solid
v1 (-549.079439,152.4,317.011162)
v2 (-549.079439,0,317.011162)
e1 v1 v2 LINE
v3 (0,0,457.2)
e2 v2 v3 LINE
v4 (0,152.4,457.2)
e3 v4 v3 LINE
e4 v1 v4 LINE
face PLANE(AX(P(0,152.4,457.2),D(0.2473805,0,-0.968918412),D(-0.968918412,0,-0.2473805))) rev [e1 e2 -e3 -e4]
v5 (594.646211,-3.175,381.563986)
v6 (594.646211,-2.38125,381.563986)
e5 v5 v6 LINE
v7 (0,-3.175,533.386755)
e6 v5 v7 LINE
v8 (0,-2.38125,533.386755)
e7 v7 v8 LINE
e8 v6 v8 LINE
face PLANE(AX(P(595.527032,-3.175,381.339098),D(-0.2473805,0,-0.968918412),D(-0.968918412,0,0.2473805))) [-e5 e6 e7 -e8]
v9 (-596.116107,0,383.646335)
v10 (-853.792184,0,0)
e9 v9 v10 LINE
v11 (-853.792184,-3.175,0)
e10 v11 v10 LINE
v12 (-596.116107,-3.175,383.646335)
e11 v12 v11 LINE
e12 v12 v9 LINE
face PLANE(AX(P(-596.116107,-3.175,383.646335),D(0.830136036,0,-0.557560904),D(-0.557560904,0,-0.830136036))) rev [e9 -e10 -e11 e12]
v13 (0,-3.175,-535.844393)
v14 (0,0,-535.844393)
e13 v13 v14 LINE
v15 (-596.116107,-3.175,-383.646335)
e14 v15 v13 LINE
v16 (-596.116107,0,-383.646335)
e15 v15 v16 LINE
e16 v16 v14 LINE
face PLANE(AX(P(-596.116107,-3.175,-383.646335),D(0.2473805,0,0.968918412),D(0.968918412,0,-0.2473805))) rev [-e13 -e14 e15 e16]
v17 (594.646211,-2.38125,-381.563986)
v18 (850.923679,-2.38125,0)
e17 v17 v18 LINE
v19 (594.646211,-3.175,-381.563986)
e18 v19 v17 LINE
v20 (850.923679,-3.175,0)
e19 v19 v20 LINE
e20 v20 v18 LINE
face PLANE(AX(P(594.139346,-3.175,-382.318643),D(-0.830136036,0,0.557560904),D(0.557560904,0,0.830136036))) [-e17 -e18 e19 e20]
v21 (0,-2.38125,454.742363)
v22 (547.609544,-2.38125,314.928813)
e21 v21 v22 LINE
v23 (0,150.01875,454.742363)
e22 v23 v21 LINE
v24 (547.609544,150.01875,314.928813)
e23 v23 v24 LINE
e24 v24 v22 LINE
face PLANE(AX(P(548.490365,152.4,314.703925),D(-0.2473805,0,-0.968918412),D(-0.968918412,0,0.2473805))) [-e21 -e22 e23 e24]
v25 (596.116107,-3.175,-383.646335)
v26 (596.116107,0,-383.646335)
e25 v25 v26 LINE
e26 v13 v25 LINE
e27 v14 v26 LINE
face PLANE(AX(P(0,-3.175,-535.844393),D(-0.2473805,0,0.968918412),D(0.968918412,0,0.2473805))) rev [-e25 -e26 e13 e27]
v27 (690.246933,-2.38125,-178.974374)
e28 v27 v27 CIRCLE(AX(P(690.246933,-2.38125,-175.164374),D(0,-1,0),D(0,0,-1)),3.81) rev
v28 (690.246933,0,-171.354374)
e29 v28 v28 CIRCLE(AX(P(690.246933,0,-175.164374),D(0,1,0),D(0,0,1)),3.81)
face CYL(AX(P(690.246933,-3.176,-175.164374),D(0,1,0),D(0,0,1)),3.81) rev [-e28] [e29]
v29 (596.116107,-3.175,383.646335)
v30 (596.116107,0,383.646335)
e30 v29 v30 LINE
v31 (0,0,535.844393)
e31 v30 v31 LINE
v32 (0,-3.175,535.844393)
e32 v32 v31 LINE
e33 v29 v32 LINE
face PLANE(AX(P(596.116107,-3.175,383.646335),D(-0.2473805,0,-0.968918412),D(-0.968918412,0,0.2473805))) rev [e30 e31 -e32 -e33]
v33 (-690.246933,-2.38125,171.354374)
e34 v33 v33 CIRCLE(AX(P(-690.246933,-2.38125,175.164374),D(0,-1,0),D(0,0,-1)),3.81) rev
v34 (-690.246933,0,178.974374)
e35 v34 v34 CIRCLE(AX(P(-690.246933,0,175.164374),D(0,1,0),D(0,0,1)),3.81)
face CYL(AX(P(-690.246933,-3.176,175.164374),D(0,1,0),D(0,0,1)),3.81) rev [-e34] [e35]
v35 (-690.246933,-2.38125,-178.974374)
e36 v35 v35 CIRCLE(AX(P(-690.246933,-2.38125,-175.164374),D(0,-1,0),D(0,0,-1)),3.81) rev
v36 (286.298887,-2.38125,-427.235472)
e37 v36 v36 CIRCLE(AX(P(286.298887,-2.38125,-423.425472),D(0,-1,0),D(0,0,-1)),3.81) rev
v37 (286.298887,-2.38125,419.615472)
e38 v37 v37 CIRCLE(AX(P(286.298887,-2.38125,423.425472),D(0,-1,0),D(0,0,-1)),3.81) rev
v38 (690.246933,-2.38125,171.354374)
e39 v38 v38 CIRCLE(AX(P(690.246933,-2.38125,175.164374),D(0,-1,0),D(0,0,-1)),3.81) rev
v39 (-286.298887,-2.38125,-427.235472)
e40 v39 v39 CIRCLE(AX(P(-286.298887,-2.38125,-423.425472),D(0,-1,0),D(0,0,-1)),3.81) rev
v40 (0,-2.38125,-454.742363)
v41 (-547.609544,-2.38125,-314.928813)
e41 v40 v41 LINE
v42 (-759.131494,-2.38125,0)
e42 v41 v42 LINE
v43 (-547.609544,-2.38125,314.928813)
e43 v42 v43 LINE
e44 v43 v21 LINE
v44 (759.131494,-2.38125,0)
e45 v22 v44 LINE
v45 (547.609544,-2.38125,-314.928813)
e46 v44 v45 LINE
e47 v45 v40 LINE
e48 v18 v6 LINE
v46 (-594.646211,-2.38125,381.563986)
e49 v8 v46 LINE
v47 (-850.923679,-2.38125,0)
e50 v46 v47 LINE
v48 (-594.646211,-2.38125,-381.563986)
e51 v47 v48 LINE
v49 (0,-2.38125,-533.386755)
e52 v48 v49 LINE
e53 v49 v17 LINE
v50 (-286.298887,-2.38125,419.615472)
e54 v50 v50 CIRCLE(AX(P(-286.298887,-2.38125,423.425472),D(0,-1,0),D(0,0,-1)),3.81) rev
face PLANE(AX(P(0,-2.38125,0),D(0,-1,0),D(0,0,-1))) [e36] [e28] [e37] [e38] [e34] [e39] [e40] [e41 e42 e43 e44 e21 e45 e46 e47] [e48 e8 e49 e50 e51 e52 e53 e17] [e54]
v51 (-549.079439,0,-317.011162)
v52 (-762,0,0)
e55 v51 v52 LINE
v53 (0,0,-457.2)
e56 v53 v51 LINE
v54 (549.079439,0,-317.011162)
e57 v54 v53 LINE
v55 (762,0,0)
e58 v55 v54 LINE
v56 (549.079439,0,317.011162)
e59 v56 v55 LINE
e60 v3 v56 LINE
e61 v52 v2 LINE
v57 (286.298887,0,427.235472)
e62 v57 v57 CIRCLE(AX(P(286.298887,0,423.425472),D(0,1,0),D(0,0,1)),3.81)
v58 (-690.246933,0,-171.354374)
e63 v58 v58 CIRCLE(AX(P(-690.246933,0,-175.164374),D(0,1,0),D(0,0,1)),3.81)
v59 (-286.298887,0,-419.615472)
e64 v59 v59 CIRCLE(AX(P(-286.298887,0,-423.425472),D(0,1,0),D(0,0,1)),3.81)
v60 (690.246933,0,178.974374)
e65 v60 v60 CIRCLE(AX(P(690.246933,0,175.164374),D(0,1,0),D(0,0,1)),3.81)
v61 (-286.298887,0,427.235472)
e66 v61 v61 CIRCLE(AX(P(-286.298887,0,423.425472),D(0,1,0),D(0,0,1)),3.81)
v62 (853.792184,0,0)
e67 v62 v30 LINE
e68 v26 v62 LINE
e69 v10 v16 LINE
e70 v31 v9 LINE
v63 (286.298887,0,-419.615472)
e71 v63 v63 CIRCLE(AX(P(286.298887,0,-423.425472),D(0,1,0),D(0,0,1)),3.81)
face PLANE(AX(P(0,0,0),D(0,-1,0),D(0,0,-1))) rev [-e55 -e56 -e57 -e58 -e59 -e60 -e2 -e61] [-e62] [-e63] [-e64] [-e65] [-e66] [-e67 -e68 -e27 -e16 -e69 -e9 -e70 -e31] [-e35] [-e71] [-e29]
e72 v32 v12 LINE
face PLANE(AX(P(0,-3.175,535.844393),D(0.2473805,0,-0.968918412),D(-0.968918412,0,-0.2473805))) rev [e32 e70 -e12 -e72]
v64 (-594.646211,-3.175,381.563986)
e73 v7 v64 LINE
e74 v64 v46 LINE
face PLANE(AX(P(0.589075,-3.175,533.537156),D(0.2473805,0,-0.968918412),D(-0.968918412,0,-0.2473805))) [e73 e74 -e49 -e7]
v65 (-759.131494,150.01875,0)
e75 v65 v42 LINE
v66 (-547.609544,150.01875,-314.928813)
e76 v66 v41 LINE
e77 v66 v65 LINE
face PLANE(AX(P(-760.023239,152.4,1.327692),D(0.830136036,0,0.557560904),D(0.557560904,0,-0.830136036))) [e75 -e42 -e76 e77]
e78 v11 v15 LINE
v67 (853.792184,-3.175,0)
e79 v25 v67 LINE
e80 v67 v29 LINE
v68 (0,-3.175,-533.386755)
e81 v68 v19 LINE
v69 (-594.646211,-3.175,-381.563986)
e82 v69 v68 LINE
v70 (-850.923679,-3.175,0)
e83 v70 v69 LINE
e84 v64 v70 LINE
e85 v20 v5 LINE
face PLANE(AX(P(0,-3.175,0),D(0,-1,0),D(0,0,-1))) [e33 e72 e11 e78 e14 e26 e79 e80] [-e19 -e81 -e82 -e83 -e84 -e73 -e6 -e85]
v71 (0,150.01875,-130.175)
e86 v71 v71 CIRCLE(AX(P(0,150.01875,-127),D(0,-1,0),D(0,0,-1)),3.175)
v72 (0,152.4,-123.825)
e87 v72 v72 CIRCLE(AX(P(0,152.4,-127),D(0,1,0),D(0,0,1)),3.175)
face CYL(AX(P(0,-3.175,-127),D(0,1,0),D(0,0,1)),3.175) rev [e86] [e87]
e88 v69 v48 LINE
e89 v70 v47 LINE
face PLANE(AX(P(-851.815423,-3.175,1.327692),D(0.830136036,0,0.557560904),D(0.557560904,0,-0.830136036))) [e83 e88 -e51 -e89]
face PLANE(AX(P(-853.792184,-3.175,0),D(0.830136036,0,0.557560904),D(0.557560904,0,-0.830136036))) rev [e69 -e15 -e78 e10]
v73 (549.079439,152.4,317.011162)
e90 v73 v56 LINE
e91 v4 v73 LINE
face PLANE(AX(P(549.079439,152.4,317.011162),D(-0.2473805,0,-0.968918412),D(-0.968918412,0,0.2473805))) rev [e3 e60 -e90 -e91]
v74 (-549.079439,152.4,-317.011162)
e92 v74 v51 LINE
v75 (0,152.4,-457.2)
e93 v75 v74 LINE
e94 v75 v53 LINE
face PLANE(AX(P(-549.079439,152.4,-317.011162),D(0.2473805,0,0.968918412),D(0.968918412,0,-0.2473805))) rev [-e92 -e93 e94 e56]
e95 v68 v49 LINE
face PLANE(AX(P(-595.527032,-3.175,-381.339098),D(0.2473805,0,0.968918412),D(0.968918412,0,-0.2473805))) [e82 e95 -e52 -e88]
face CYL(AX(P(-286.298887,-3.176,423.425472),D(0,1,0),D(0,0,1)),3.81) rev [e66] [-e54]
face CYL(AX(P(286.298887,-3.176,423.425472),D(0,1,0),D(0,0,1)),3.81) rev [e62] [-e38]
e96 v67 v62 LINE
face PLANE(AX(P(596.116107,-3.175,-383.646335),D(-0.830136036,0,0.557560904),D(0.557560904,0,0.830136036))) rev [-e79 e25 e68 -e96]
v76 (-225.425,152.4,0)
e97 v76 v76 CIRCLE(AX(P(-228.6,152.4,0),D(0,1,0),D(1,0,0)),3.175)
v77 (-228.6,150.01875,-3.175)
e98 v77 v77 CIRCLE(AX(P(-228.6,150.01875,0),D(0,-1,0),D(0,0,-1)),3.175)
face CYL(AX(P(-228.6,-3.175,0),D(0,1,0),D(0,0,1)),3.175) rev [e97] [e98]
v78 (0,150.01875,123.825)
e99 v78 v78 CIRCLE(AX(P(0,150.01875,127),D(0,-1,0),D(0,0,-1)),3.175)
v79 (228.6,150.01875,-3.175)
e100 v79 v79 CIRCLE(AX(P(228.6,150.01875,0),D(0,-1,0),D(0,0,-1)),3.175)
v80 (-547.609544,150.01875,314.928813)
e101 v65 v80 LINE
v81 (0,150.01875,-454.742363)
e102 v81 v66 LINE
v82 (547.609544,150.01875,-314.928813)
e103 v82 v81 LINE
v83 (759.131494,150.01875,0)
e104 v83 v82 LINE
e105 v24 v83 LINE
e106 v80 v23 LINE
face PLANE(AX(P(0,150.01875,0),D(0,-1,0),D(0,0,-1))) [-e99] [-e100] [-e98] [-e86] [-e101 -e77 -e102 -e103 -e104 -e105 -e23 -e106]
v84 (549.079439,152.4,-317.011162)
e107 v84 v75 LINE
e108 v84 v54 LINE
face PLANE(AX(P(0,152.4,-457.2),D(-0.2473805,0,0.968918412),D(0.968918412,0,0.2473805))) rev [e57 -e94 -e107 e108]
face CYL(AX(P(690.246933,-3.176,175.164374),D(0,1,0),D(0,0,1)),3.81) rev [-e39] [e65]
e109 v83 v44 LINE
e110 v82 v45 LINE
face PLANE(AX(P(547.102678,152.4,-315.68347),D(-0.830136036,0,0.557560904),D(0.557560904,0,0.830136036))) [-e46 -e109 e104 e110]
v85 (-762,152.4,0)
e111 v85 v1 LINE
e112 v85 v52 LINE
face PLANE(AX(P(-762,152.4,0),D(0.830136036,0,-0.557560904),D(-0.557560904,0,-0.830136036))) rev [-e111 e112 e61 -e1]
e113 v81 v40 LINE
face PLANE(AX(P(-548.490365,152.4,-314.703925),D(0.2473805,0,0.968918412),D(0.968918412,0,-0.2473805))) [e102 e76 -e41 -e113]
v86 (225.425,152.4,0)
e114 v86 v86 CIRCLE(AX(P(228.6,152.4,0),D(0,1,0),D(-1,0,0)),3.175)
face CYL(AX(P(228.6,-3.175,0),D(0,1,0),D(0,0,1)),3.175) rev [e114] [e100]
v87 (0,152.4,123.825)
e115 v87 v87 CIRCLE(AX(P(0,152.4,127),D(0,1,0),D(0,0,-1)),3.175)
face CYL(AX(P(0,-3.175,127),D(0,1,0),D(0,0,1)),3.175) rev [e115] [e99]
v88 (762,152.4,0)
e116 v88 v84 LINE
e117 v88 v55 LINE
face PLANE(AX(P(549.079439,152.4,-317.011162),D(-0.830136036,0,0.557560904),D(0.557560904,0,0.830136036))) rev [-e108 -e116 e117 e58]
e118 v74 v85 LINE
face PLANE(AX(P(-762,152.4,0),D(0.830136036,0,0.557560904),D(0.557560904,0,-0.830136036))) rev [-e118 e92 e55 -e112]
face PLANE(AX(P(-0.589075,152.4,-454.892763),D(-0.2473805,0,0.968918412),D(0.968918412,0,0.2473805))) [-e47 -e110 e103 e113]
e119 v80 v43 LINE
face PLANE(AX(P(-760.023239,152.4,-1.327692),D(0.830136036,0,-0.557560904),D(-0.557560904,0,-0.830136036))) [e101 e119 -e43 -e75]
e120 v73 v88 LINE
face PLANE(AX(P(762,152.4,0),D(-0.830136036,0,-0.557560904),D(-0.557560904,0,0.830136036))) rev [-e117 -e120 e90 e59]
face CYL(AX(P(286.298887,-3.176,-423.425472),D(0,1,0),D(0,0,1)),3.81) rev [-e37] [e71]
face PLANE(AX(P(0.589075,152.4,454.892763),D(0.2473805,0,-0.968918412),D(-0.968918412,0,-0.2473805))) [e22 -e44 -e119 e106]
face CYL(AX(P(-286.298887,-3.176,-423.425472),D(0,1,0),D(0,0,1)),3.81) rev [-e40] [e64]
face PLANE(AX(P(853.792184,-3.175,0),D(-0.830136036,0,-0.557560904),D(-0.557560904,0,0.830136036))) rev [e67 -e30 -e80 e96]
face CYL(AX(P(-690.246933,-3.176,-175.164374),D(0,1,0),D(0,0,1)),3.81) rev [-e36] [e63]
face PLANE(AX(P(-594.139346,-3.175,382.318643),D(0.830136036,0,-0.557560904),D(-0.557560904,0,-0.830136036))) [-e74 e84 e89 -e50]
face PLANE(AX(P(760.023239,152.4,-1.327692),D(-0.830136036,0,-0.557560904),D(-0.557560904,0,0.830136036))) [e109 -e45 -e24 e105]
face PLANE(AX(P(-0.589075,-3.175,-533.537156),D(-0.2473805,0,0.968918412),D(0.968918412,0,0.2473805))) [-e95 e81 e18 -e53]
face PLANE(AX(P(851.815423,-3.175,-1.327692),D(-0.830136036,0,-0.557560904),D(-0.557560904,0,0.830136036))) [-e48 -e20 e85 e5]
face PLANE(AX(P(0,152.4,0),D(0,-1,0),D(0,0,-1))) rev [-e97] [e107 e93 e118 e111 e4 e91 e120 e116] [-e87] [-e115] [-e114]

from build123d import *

# Parameters (mm, degrees)
BOSS_EXTRUDE1_DEPTH   = 152.4
BOSS_EXTRUDE2_DEPTH   = 3.175
SHELL1_T              = -2.38125
SKETCH3_R             = 3.175
CUT_EXTRUDE1_DEPTH    = 1020.94798284
CRVPATTERN1_START     = 150.01875
CRVPATTERN1_OUTLINE_R = 3.175
CRVPATTERN1_DEPTH     = 2.38125
CUT_EXTRUDE2_REACH    = 1021.469
SKETCH5_R             = 3.81


# Read off the part's stored shape, not the designer's step: CrvPattern1
with BuildPart() as part:
    # Sketch1 → Boss-Extrude1 (new body)
    with BuildSketch(Plane(origin=(0, 0, 0), x_dir=(1, 0, 0), z_dir=(0, 1, 0))):
        Polygon((-549.079439398, 317.011162143), (0, 457.2), (549.079439398, 317.011162143), (762, 0), (549.079439398, -317.011162143), (0, -457.2), (-549.079439398, -317.011162143), (-762, 0), align=None)
    extrude(amount=BOSS_EXTRUDE1_DEPTH)

    # Sketch2 → Boss-Extrude2 (add)
    with BuildSketch(Plane.XZ):
        Polygon((0, 535.844392641), (-596.116107134, 383.646334781), (-853.792184287, 0), (-596.116107134, -383.646334781), (0, -535.844392641), (596.116107134, -383.646334781), (853.792184287, 0), (596.116107134, 383.646334781), align=None)
    extrude(amount=BOSS_EXTRUDE2_DEPTH)

    # Shell1
    shell1_openings = [part.faces().sort_by_distance(p)[0] for p in [
        (0, -3.175, 0),
    ]]
    offset(amount=SHELL1_T, openings=shell1_openings, kind=Kind.INTERSECTION)

    # Sketch3 → Cut-Extrude1 (cut, through all)
    with BuildSketch(Plane(origin=(0, 152.4, 0), x_dir=(1, 0, 0), z_dir=(0, 1, 0))):
        with Locations(Location((0, 127, 0), (0, 0, 270))):
            Circle(SKETCH3_R)
    extrude(amount=-CUT_EXTRUDE1_DEPTH, mode=Mode.SUBTRACT)

    # CrvPattern1 outline → CrvPattern1 (cut)
    with BuildSketch(Plane(origin=(0, 0, 0), x_dir=(1, 0, 0), z_dir=(0, 1, 0)).offset(CRVPATTERN1_START)):
        with Locations((-228.6, 0)):
            Circle(CRVPATTERN1_OUTLINE_R)
        with Locations((0, -127)):
            Circle(CRVPATTERN1_OUTLINE_R)
        with Locations((228.6, 0)):
            Circle(CRVPATTERN1_OUTLINE_R)
    extrude(amount=CRVPATTERN1_DEPTH, mode=Mode.SUBTRACT)

    # Sketch5 → Cut-Extrude2 (cut, up to next)
    with BuildSketch(Plane(origin=(0, 0, 0), x_dir=(1, 0, 0), z_dir=(0, 1, 0)), mode=Mode.PRIVATE) as cut_extrude2_sk1:
        with Locations(Location((-286.298886633, 423.425472391, 0), (0, 0, 270))):
            Circle(SKETCH5_R)
    cut_extrude2_tool1 = extrude(cut_extrude2_sk1.sketch, amount=-CUT_EXTRUDE2_REACH, mode=Mode.PRIVATE) & part.part
    # Sketch5 → Cut-Extrude2 (cut, up to next)
    with BuildSketch(Plane(origin=(0, 0, 0), x_dir=(1, 0, 0), z_dir=(0, 1, 0)), mode=Mode.PRIVATE) as cut_extrude2_sk2:
        with Locations(Location((-690.246932705, 175.164374231, 0), (0, 0, 270))):
            Circle(SKETCH5_R)
    cut_extrude2_tool2 = extrude(cut_extrude2_sk2.sketch, amount=-CUT_EXTRUDE2_REACH, mode=Mode.PRIVATE) & part.part
    # Sketch5 → Cut-Extrude2 (cut, up to next)
    with BuildSketch(Plane(origin=(0, 0, 0), x_dir=(1, 0, 0), z_dir=(0, 1, 0)), mode=Mode.PRIVATE) as cut_extrude2_sk3:
        with Locations(Location((-690.246932705, -175.164374231, 0), (0, 0, 270))):
            Circle(SKETCH5_R)
    cut_extrude2_tool3 = extrude(cut_extrude2_sk3.sketch, amount=-CUT_EXTRUDE2_REACH, mode=Mode.PRIVATE) & part.part
    # Sketch5 → Cut-Extrude2 (cut, up to next)
    with BuildSketch(Plane(origin=(0, 0, 0), x_dir=(1, 0, 0), z_dir=(0, 1, 0)), mode=Mode.PRIVATE) as cut_extrude2_sk4:
        with Locations(Location((-286.298886633, -423.425472391, 0), (0, 0, 270))):
            Circle(SKETCH5_R)
    cut_extrude2_tool4 = extrude(cut_extrude2_sk4.sketch, amount=-CUT_EXTRUDE2_REACH, mode=Mode.PRIVATE) & part.part
    # Sketch5 → Cut-Extrude2 (cut, up to next)
    with BuildSketch(Plane(origin=(0, 0, 0), x_dir=(1, 0, 0), z_dir=(0, 1, 0)), mode=Mode.PRIVATE) as cut_extrude2_sk5:
        with Locations(Location((286.298886633, -423.425472391, 0), (0, 0, 270))):
            Circle(SKETCH5_R)
    cut_extrude2_tool5 = extrude(cut_extrude2_sk5.sketch, amount=-CUT_EXTRUDE2_REACH, mode=Mode.PRIVATE) & part.part
    # Sketch5 → Cut-Extrude2 (cut, up to next)
    with BuildSketch(Plane(origin=(0, 0, 0), x_dir=(1, 0, 0), z_dir=(0, 1, 0)), mode=Mode.PRIVATE) as cut_extrude2_sk6:
        with Locations(Location((690.246932705, -175.164374231, 0), (0, 0, 270))):
            Circle(SKETCH5_R)
    cut_extrude2_tool6 = extrude(cut_extrude2_sk6.sketch, amount=-CUT_EXTRUDE2_REACH, mode=Mode.PRIVATE) & part.part
    # Sketch5 → Cut-Extrude2 (cut, up to next)
    with BuildSketch(Plane(origin=(0, 0, 0), x_dir=(1, 0, 0), z_dir=(0, 1, 0)), mode=Mode.PRIVATE) as cut_extrude2_sk7:
        with Locations(Location((690.246932705, 175.164374231, 0), (0, 0, 270))):
            Circle(SKETCH5_R)
    cut_extrude2_tool7 = extrude(cut_extrude2_sk7.sketch, amount=-CUT_EXTRUDE2_REACH, mode=Mode.PRIVATE) & part.part
    # Sketch5 → Cut-Extrude2 (cut, up to next)
    with BuildSketch(Plane(origin=(0, 0, 0), x_dir=(1, 0, 0), z_dir=(0, 1, 0)), mode=Mode.PRIVATE) as cut_extrude2_sk8:
        with Locations(Location((286.298886633, 423.425472391, 0), (0, 0, 270))):
            Circle(SKETCH5_R)
    cut_extrude2_tool8 = extrude(cut_extrude2_sk8.sketch, amount=-CUT_EXTRUDE2_REACH, mode=Mode.PRIVATE) & part.part
    add(cut_extrude2_tool1.solids().sort_by_distance((-286.298887, 0, -423.425472))[0], mode=Mode.SUBTRACT)
    add(cut_extrude2_tool2.solids().sort_by_distance((-690.246933, 0, -175.164374))[0], mode=Mode.SUBTRACT)
    add(cut_extrude2_tool3.solids().sort_by_distance((-690.246933, 0, 175.164374))[0], mode=Mode.SUBTRACT)
    add(cut_extrude2_tool4.solids().sort_by_distance((-286.298887, 0, 423.425472))[0], mode=Mode.SUBTRACT)
    add(cut_extrude2_tool5.solids().sort_by_distance((286.298887, 0, 423.425472))[0], mode=Mode.SUBTRACT)
    add(cut_extrude2_tool6.solids().sort_by_distance((690.246933, 0, 175.164374))[0], mode=Mode.SUBTRACT)
    add(cut_extrude2_tool7.solids().sort_by_distance((690.246933, 0, -175.164374))[0], mode=Mode.SUBTRACT)
    add(cut_extrude2_tool8.solids().sort_by_distance((286.298887, 0, -423.425472))[0], mode=Mode.SUBTRACT)


solid = part.part
